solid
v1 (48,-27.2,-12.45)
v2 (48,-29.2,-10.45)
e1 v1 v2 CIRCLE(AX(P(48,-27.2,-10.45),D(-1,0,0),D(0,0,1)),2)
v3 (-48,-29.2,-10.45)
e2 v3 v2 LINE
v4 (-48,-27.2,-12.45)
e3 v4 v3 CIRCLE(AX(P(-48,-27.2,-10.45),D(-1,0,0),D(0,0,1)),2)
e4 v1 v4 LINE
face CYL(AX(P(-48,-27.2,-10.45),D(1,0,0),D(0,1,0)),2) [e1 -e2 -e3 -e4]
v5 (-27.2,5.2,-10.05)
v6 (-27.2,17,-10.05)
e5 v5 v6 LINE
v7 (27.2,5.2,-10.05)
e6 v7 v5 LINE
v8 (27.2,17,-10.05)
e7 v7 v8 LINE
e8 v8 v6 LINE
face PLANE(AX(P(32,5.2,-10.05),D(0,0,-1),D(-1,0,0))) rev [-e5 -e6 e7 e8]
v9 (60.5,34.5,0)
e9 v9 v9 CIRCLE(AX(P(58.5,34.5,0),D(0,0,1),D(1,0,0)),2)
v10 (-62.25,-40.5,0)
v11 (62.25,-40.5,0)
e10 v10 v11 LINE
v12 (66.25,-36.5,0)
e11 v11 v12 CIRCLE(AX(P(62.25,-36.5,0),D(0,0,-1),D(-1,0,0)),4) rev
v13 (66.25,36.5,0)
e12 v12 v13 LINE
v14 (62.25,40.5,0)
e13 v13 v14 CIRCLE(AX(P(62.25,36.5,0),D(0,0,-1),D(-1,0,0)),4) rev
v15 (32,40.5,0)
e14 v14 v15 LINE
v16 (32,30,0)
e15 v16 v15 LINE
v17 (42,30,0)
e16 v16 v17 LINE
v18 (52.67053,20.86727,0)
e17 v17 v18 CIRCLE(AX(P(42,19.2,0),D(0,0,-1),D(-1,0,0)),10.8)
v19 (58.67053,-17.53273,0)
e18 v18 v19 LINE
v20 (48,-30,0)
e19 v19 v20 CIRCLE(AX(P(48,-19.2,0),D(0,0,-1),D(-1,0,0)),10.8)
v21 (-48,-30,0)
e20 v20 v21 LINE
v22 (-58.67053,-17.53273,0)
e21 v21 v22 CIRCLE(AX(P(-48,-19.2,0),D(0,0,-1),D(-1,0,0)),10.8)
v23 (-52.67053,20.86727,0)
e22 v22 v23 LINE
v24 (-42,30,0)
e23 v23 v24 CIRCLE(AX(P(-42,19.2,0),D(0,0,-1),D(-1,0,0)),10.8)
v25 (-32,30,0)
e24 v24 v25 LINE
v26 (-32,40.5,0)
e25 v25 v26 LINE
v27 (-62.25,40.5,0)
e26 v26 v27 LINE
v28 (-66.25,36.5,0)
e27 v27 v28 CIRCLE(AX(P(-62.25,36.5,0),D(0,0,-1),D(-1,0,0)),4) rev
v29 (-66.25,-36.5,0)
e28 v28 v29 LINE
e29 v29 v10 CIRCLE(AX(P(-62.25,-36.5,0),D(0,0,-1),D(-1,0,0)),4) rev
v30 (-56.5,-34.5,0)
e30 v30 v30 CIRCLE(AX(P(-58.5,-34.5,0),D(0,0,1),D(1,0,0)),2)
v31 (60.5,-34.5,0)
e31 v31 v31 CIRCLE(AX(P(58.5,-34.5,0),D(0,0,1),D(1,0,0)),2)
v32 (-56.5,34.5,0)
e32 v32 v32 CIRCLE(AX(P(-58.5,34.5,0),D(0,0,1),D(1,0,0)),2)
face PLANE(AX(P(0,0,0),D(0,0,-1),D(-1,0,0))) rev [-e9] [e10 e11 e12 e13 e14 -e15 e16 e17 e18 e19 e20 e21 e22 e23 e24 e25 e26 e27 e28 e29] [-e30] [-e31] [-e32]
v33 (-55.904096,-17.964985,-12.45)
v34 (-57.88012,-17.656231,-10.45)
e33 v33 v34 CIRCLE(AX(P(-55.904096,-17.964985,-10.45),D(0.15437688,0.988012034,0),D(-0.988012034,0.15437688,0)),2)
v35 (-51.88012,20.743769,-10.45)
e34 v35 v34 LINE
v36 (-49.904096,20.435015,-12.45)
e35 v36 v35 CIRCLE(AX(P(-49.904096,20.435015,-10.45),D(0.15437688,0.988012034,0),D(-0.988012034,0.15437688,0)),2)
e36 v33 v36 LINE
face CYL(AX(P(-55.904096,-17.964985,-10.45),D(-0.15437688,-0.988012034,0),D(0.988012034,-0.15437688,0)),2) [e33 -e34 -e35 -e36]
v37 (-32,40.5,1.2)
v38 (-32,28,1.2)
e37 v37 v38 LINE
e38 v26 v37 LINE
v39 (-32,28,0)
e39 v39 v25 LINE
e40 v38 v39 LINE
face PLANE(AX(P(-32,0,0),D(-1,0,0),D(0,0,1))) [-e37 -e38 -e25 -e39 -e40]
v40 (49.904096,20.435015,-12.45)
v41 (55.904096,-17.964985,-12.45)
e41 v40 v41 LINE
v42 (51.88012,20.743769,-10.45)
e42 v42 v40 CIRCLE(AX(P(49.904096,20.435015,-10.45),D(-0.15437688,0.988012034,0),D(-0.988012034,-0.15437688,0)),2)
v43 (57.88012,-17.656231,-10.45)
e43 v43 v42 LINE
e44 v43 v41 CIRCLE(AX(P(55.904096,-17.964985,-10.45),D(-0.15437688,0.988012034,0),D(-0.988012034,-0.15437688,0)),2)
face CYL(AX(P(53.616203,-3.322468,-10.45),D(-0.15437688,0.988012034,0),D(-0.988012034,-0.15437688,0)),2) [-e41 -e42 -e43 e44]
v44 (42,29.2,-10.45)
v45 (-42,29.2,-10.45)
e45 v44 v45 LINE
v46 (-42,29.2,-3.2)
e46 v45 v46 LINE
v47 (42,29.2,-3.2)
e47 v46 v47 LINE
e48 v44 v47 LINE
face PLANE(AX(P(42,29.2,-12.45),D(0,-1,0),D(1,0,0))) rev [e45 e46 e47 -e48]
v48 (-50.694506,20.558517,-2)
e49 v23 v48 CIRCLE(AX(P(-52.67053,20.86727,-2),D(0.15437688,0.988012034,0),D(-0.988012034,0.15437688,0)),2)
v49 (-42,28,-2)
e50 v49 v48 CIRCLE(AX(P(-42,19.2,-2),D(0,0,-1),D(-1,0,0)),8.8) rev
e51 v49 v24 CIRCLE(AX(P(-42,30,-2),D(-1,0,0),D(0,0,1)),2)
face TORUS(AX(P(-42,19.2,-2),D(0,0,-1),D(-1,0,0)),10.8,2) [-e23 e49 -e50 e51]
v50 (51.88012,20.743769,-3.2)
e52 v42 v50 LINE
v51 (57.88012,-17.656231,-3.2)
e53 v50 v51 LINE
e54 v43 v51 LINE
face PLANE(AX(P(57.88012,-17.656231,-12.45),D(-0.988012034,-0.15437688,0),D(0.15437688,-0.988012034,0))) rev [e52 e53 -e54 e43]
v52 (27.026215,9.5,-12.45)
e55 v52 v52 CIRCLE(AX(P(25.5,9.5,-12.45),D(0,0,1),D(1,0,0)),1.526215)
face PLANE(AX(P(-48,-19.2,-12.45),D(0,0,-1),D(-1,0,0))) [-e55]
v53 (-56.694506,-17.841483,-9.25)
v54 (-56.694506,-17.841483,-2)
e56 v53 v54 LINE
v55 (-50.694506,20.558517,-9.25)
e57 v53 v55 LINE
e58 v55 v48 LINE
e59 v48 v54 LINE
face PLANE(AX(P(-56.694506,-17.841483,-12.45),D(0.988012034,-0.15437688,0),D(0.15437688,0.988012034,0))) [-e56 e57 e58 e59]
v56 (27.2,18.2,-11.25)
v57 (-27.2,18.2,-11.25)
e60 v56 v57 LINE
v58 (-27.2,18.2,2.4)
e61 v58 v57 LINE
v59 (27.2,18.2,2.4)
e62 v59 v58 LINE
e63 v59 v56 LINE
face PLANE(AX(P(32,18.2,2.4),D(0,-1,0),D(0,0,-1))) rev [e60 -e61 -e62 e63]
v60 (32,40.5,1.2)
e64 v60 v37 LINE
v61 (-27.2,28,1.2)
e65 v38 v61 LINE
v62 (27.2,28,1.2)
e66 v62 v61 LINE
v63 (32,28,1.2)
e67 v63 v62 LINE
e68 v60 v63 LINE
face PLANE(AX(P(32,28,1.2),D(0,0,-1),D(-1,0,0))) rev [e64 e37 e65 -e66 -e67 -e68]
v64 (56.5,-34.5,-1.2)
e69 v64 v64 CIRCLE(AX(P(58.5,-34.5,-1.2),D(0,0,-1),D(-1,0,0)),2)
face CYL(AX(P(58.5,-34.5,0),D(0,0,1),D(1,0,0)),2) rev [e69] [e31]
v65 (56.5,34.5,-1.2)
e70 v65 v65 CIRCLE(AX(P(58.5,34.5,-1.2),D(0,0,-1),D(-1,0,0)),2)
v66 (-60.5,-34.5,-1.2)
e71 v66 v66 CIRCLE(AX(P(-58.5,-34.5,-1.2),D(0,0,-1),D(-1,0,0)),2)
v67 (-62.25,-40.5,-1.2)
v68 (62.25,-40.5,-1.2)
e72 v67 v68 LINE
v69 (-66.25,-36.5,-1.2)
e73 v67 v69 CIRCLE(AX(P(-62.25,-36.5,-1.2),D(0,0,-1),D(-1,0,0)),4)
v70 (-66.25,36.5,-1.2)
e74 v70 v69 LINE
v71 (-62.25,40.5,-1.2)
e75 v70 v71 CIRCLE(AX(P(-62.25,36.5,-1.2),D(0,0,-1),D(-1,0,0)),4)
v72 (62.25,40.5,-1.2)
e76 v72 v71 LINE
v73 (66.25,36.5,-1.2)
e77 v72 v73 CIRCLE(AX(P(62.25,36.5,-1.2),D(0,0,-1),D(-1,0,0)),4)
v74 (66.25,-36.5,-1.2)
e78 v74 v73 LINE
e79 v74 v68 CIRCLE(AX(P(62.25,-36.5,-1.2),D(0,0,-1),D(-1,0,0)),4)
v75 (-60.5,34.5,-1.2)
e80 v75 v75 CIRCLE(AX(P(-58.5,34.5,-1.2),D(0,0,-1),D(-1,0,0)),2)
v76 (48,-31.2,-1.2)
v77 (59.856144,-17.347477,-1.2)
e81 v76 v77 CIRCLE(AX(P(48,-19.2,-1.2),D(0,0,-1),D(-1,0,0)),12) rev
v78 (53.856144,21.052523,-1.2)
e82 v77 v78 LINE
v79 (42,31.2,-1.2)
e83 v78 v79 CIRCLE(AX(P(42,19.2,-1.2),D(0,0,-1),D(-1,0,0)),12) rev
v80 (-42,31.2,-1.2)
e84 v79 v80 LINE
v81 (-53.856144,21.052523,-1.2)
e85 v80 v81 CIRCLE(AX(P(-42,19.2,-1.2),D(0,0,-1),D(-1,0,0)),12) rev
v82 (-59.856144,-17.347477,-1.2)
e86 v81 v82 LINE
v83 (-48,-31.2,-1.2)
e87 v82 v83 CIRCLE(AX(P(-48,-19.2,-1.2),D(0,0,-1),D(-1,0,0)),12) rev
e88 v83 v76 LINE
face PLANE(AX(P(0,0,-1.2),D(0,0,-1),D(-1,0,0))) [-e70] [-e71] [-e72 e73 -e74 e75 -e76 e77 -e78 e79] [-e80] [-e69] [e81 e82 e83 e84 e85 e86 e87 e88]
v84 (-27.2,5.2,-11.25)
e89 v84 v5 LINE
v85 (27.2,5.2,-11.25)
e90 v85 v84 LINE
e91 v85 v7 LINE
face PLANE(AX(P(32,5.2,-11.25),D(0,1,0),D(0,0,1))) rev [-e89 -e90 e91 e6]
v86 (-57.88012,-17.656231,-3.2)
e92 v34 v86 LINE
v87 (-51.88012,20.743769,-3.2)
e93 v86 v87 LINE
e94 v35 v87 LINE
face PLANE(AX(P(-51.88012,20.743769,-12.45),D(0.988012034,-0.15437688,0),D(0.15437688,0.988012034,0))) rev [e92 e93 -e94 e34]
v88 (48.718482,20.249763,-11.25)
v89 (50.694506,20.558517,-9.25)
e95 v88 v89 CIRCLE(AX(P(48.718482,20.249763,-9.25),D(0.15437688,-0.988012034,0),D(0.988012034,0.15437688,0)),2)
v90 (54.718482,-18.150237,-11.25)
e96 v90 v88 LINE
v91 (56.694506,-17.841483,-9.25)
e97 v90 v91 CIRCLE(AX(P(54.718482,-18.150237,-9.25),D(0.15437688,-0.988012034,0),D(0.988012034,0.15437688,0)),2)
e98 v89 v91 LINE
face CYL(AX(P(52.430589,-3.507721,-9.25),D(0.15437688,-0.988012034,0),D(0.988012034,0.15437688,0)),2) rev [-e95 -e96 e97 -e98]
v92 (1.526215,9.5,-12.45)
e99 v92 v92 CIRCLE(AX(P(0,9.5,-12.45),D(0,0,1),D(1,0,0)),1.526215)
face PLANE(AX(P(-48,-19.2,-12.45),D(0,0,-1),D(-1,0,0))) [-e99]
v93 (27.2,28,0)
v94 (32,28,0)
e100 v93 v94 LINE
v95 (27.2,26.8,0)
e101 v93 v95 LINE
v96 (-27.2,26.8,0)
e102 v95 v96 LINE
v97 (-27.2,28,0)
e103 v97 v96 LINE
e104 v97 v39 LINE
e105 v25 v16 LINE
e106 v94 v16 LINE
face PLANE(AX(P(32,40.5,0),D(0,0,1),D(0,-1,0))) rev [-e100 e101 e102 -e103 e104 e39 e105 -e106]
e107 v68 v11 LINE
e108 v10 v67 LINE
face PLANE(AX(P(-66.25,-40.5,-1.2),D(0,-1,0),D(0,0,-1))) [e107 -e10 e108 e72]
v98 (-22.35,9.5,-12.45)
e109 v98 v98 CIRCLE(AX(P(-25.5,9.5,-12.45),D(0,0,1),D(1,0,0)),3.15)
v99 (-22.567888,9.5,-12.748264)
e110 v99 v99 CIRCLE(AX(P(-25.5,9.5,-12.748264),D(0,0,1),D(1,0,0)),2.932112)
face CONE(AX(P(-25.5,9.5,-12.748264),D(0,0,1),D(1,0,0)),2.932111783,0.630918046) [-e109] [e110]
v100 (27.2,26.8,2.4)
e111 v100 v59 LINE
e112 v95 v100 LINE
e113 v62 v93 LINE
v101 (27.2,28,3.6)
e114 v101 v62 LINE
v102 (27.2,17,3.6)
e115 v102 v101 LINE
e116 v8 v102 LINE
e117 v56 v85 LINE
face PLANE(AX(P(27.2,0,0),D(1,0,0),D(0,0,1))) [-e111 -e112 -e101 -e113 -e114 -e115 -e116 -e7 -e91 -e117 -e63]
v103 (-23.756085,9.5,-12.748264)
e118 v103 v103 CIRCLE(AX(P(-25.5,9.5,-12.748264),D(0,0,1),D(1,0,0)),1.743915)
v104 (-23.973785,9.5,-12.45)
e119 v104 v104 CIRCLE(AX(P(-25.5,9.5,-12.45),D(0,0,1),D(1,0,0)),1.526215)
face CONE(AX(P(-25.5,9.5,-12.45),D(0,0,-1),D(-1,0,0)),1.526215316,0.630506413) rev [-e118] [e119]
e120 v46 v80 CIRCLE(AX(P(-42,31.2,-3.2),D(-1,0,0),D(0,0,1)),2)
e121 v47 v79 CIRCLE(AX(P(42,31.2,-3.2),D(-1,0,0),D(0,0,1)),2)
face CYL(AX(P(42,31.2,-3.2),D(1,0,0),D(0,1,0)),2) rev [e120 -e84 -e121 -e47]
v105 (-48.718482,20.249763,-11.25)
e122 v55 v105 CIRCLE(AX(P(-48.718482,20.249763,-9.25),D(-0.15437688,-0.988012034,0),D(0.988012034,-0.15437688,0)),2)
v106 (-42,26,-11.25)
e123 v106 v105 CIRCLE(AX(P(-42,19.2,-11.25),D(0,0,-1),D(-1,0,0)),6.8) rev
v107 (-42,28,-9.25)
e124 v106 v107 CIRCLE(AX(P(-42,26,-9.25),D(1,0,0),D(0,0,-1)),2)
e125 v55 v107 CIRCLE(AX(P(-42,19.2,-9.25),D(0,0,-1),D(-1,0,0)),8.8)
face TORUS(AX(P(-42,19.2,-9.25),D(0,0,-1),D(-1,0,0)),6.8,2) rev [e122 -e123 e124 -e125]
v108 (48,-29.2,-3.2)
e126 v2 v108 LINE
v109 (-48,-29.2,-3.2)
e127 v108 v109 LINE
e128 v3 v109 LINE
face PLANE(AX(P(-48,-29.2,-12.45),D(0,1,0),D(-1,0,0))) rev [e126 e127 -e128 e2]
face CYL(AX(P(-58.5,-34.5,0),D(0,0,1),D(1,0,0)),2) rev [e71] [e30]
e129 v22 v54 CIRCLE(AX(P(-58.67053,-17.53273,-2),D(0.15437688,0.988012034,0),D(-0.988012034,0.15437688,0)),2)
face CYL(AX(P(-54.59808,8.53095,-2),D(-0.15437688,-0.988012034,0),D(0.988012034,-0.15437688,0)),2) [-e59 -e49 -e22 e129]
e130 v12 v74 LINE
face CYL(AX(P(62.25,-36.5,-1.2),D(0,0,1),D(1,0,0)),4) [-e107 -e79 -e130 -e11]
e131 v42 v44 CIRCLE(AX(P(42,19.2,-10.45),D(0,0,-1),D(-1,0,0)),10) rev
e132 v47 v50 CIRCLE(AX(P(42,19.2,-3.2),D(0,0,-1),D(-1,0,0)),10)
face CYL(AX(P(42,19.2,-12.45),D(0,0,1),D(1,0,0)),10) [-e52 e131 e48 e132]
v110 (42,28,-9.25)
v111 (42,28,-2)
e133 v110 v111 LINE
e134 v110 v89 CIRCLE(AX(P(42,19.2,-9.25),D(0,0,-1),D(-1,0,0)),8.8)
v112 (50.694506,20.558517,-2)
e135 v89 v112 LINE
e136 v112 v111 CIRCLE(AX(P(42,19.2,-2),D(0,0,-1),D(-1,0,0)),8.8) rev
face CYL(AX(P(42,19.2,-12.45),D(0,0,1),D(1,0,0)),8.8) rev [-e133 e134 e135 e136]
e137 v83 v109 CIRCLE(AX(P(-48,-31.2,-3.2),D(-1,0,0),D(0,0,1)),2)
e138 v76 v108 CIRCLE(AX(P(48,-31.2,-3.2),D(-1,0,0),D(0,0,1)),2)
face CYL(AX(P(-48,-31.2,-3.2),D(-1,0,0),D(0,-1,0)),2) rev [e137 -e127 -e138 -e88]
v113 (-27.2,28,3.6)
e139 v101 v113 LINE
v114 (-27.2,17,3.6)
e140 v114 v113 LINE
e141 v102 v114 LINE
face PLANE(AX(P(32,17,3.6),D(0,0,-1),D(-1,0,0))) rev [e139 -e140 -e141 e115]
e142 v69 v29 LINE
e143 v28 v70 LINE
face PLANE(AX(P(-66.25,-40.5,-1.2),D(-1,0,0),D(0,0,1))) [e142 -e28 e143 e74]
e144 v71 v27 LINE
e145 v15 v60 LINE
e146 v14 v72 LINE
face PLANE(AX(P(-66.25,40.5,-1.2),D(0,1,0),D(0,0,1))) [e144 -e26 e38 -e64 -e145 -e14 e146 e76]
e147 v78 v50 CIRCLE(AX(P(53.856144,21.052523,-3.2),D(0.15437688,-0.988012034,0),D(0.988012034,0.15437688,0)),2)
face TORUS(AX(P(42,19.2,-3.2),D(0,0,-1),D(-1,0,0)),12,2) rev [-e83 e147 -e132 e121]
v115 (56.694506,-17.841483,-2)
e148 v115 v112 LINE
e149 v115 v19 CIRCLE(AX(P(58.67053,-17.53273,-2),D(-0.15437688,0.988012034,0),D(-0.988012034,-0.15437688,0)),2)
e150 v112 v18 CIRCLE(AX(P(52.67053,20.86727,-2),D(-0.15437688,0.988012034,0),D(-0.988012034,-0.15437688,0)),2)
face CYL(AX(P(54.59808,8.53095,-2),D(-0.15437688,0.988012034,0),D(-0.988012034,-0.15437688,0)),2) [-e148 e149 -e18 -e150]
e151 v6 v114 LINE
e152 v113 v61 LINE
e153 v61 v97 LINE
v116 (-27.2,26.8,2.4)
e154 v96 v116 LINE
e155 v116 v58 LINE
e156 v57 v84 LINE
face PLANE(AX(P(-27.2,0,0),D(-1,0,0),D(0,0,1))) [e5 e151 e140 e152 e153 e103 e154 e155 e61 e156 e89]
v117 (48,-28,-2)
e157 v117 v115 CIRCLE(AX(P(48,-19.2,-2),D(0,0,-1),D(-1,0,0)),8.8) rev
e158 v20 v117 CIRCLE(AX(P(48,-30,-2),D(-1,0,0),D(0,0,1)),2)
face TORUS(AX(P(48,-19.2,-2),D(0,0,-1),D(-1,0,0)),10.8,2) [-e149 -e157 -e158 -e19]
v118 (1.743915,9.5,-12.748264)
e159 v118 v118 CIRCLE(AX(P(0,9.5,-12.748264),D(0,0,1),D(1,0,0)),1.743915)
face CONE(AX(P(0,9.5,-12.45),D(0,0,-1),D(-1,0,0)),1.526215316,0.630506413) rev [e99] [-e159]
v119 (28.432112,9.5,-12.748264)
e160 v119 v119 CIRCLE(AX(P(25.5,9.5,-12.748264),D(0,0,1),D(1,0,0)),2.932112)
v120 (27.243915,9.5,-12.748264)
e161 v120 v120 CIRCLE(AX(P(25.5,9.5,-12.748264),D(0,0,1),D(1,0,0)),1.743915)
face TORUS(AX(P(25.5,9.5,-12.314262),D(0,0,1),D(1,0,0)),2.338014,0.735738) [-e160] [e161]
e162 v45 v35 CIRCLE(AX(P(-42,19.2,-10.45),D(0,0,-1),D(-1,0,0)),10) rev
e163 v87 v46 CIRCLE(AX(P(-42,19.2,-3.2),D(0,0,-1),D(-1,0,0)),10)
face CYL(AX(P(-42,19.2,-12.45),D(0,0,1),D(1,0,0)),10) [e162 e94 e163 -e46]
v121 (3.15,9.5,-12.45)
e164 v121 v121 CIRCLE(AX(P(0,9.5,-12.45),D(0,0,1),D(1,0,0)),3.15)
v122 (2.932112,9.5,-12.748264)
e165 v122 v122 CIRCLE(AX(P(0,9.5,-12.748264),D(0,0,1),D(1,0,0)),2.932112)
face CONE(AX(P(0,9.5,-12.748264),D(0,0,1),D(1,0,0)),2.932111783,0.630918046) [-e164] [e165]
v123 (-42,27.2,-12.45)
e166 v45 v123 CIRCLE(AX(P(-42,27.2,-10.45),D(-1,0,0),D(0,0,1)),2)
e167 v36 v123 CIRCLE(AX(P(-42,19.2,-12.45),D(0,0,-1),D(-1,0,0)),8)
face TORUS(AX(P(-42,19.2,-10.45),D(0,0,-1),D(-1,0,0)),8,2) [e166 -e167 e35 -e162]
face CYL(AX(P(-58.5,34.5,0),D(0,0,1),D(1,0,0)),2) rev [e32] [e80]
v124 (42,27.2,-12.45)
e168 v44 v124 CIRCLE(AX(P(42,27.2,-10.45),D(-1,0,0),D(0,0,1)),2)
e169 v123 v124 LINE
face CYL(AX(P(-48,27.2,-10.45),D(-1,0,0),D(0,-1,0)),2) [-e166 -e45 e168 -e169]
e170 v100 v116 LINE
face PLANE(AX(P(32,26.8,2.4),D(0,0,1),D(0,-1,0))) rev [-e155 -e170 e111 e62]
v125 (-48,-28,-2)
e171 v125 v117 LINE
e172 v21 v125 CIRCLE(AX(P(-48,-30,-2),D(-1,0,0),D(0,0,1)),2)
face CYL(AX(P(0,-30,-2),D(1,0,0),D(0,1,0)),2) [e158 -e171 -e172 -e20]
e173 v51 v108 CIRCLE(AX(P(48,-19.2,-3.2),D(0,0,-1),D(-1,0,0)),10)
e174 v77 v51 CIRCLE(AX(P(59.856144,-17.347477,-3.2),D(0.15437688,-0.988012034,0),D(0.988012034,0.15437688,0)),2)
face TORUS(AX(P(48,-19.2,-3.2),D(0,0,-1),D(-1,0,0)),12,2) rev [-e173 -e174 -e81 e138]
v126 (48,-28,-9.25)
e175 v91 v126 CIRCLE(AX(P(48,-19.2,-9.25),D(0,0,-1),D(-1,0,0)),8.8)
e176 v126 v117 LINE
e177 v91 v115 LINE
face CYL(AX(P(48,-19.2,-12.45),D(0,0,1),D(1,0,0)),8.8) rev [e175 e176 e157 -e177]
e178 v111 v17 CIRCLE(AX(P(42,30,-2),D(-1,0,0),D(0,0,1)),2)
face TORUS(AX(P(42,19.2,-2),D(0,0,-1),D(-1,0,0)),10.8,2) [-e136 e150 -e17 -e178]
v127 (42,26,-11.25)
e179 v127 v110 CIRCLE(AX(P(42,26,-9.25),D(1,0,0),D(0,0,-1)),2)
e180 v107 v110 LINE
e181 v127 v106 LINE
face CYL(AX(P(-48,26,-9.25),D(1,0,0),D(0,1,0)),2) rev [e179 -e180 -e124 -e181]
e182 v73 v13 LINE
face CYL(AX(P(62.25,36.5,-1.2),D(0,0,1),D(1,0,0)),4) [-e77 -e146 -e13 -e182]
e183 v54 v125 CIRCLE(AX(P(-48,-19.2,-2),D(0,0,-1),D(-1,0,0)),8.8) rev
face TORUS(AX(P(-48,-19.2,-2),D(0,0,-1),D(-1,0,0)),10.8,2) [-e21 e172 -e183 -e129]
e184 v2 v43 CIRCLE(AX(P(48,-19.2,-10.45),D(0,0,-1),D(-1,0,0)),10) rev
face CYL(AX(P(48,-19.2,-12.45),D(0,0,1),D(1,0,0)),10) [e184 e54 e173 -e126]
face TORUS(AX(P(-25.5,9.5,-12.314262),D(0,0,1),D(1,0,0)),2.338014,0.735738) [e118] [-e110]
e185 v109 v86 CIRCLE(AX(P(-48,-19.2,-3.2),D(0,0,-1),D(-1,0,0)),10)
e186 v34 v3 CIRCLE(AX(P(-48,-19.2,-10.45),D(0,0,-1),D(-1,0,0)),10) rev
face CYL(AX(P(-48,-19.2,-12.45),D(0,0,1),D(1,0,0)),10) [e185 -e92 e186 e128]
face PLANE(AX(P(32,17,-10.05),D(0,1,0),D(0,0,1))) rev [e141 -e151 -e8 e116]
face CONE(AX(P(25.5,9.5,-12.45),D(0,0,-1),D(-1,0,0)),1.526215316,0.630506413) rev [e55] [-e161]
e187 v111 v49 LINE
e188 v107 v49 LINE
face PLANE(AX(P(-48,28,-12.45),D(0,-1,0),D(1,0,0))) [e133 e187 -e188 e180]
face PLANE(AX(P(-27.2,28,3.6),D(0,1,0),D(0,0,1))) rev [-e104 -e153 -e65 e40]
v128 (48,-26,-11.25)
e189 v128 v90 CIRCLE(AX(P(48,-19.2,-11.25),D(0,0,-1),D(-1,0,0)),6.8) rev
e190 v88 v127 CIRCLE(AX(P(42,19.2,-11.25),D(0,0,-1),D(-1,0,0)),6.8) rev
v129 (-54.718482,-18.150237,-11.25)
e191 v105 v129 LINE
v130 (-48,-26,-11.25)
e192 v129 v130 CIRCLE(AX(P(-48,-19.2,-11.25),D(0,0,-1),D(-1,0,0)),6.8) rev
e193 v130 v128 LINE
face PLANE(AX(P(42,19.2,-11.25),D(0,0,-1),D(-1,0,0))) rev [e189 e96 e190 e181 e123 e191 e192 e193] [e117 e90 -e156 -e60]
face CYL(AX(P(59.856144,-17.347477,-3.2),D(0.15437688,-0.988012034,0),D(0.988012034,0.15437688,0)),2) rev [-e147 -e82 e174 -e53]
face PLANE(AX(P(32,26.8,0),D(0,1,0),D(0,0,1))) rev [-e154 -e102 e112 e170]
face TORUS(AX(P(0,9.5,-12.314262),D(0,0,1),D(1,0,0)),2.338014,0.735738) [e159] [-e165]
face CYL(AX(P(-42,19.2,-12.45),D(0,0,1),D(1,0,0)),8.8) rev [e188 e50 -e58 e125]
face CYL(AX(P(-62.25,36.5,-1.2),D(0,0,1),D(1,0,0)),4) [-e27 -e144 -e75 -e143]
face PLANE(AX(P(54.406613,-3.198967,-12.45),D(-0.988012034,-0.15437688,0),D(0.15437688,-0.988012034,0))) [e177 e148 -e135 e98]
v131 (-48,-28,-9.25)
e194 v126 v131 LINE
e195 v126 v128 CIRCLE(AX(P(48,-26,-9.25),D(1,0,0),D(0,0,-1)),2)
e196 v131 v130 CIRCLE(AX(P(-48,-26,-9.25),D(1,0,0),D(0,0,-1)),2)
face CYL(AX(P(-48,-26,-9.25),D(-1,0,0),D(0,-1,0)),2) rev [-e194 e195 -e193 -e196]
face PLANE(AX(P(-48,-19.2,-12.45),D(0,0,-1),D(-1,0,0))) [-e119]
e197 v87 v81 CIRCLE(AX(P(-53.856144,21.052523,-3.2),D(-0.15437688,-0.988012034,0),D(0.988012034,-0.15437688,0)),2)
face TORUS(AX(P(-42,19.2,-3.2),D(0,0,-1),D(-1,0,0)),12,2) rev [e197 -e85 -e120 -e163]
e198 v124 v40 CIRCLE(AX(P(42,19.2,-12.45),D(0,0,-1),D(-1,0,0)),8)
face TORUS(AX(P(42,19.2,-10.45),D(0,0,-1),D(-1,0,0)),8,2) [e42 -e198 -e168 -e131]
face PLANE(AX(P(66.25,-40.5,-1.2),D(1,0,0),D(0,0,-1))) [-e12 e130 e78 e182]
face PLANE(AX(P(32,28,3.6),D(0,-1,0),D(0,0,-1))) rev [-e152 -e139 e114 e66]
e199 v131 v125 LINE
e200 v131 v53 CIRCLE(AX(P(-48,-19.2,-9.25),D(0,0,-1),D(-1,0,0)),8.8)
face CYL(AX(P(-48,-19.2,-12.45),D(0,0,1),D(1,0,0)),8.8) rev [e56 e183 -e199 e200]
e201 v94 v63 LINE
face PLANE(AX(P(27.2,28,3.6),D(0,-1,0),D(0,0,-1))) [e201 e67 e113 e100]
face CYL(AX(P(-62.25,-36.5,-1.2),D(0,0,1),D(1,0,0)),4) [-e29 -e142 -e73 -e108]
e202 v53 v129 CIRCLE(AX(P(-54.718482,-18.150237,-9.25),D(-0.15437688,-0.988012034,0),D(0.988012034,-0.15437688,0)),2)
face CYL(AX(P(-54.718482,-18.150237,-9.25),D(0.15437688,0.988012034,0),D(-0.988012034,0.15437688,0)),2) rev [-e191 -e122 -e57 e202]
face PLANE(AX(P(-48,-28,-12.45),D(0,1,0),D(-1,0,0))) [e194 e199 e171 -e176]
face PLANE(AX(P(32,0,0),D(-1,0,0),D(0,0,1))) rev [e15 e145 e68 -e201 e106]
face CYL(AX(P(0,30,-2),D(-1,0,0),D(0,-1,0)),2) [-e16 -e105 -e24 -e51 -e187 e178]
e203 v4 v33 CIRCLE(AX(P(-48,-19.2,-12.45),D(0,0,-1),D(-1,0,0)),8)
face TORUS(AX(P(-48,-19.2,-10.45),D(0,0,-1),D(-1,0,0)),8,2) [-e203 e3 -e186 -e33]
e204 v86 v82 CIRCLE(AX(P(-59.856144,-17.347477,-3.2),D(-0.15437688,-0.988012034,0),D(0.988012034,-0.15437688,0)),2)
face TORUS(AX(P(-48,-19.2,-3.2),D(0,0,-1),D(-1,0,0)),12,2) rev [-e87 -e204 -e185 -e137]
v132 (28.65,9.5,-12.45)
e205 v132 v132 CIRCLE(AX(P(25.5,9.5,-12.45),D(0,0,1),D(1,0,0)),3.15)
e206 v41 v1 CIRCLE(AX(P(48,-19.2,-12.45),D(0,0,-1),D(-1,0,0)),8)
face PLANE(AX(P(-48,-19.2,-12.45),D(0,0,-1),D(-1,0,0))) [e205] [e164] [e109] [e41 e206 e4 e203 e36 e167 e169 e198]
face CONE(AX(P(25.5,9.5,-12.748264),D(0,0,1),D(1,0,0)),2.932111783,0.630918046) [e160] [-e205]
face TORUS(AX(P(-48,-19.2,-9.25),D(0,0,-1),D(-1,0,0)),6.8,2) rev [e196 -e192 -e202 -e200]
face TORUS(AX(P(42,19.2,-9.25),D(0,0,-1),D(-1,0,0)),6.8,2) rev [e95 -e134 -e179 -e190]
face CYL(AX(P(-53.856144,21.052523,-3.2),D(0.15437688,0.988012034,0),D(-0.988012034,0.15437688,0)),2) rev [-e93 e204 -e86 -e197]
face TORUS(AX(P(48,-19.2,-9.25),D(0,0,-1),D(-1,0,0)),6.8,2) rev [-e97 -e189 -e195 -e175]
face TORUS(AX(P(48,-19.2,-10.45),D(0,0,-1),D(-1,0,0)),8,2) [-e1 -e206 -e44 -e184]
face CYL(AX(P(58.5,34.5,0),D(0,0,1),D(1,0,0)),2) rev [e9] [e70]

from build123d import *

# Parameters (mm, degrees)
SKETCH1_W                = 132.5
SKETCH1_H                = 81
BOSS_EXTRUDE1_DEPTH      = 1.2
EXTRUDE_THIN1_DEPTH      = 11.25
CUT_EXTRUDE1_DEPTH       = 79.459384397
BOSS_EXTRUDE2_START      = -1.2
BOSS_EXTRUDE2_DEPTH      = 1.2
FILLET1_R                = 2
FILLET2_R                = 4
F_4_0_4_DIAMETER_HOLE1_D = 4
BOSS_EXTRUDE3_DEPTH      = 32
CUT_EXTRUDE3_DEPTH       = 4.8
LPATTERN1_COUNT          = 2
LPATTERN1_PITCH          = 25.5
LPATTERN1_COUNT_DIR2     = 2
LPATTERN1_PITCH_DIR2     = 25.5


with BuildPart() as part:
    # Sketch1 → Boss-Extrude1 (new body)
    with BuildSketch(Plane.XY):
        Rectangle(SKETCH1_W, SKETCH1_H)
    extrude(amount=-BOSS_EXTRUDE1_DEPTH)

    # Sketch2 → Extrude-Thin1 (add)
    with BuildSketch(Plane(origin=(0, 0, -1.2), x_dir=(-1, 0, 0), z_dir=(0, 0, -1))):
        with BuildLine():
            Line((-42, 29.2), (42, 29.2))
            ThreePointArc((42, 29.2), (48.502396173, 26.797291887), (51.880120338, 20.743768803))
            Line((51.880120338, 20.743768803), (57.880120338, -17.656231197))
            ThreePointArc((57.880120338, -17.656231197), (55.597291887, -25.702396173), (48, -29.2))
            Line((48, -29.2), (-48, -29.2))
            ThreePointArc((-48, -29.2), (-55.597291887, -25.702396173), (-57.880120338, -17.656231197))
            Line((-57.880120338, -17.656231197), (-51.880120338, 20.743768803))
            ThreePointArc((-51.880120338, 20.743768803), (-48.502396173, 26.797291887), (-42, 29.2))
        make_face()
        with BuildLine():
            Line((-42, 28), (42, 28))
            ThreePointArc((42, 28), (47.722108632, 25.88561686), (50.694505897, 20.558516546))
            Line((50.694505897, 20.558516546), (56.694505897, -17.841483454))
            ThreePointArc((56.694505897, -17.841483454), (54.68561686, -24.922108632), (48, -28))
            Line((48, -28), (-48, -28))
            ThreePointArc((-48, -28), (-54.68561686, -24.922108632), (-56.694505897, -17.841483454))
            Line((-56.694505897, -17.841483454), (-50.694505897, 20.558516546))
            ThreePointArc((-50.694505897, 20.558516546), (-47.722108632, 25.88561686), (-42, 28))
        make_face(mode=Mode.SUBTRACT)
    extrude(amount=EXTRUDE_THIN1_DEPTH)

    # Sketch3 → Cut-Extrude1 (cut, through all)
    with BuildSketch(Plane(origin=(0, 0, -1.2), x_dir=(-1, 0, 0), z_dir=(0, 0, -1))):
        with BuildLine():
            Line((56.694505897, -17.841483454), (50.694505897, 20.558516546))
            ThreePointArc((50.694505897, 20.558516546), (47.722108632, 25.88561686), (42, 28))
            Line((42, 28), (-42, 28))
            ThreePointArc((-42, 28), (-47.722108632, 25.88561686), (-50.694505897, 20.558516546))
            Line((-50.694505897, 20.558516546), (-56.694505897, -17.841483454))
            ThreePointArc((-56.694505897, -17.841483454), (-54.68561686, -24.922108632), (-48, -28))
            Line((-48, -28), (48, -28))
            ThreePointArc((48, -28), (54.68561686, -24.922108632), (56.694505897, -17.841483454))
        make_face()
    extrude(amount=-CUT_EXTRUDE1_DEPTH, mode=Mode.SUBTRACT)

    # Sketch4 → Boss-Extrude2 (add)
    with BuildSketch(Plane(origin=(0, 0, -12.45), x_dir=(-1, 0, 0), z_dir=(0, 0, -1)).offset(BOSS_EXTRUDE2_START)):
        with BuildLine():
            Line((-51.880120338, 20.743768803), (-57.880120338, -17.656231197))
            ThreePointArc((-57.880120338, -17.656231197), (-55.597291887, -25.702396173), (-48, -29.2))
            Line((-48, -29.2), (48, -29.2))
            ThreePointArc((48, -29.2), (55.597291887, -25.702396173), (57.880120338, -17.656231197))
            Line((57.880120338, -17.656231197), (51.880120338, 20.743768803))
            ThreePointArc((51.880120338, 20.743768803), (48.502396173, 26.797291887), (42, 29.2))
            Line((42, 29.2), (-42, 29.2))
            ThreePointArc((-42, 29.2), (-48.502396173, 26.797291887), (-51.880120338, 20.743768803))
        make_face()
    extrude(amount=BOSS_EXTRUDE2_DEPTH)

    # Fillet1
    fillet1_edges = [part.edges().sort_by_distance(p)[0] for p in [
        (-48.502396173, 26.797291887, -12.45),
        (-54.880120338, 1.543768803, -12.45),
        (-55.597291887, -25.702396173, -12.45),
        (0, -29.2, -12.45),
        (55.597291887, -25.702396173, -12.45),
        (54.880120338, 1.543768803, -12.45),
        (48.502396173, 26.797291887, -12.45),
        (-47.722108632, 25.88561686, 0),
        (-53.694505897, 1.358516546, 0),
        (-54.68561686, -24.922108632, 0),
        (0, -28, 0),
        (54.68561686, -24.922108632, 0),
        (53.694505897, 1.358516546, 0),
        (47.722108632, 25.88561686, 0),
        (0, 29.2, -12.45),
        (0, 28, 0),
        (-47.722108632, 25.88561686, -11.25),
        (-53.694505897, 1.358516546, -11.25),
        (-54.68561686, -24.922108632, -11.25),
        (0, -28, -11.25),
        (54.68561686, -24.922108632, -11.25),
        (53.694505897, 1.358516546, -11.25),
        (47.722108632, 25.88561686, -11.25),
        (48.502396173, 26.797291887, -1.2),
        (0, 29.2, -1.2),
        (-48.502396173, 26.797291887, -1.2),
        (-54.880120338, 1.543768803, -1.2),
        (-55.597291887, -25.702396173, -1.2),
        (0, -29.2, -1.2),
        (55.597291887, -25.702396173, -1.2),
        (0, 28, -11.25),
        (54.880120338, 1.543768803, -1.2),
    ]]
    fillet(fillet1_edges, radius=FILLET1_R)

    # Fillet2
    fillet2_edges = [part.edges().sort_by_distance(p)[0] for p in [
        (-66.25, -40.5, -0.6),
        (-66.25, 40.5, -0.6),
        (66.25, 40.5, -0.6),
        (66.25, -40.5, -0.6),
    ]]
    fillet(fillet2_edges, radius=FILLET2_R)

    # Ø4.0 (4) Diameter Hole1 (through all)
    with Locations(Plane.XY):
        with Locations((-58.5, 34.5), (58.5, 34.5), (58.5, -34.5), (-58.5, -34.5)):
            Hole(F_4_0_4_DIAMETER_HOLE1_D / 2)

    # Sketch7 → Boss-Extrude3 (add, symmetric)
    with BuildSketch(Plane(origin=(0, 0, 0), x_dir=(0, 0, -1), z_dir=(1, 0, 0))):
        Polygon((0, 40.5), (0, 26.8), (-2.4, 26.8), (-2.4, 18.2), (11.25, 18.2), (11.25, 5.2), (10.05, 5.2), (10.05, 17), (-3.6, 17), (-3.6, 28), (-1.2, 28), (-1.2, 40.5), align=None)
    extrude(amount=BOSS_EXTRUDE3_DEPTH, both=True)

    # Sketch9 → Cut-Extrude3 (cut)
    with BuildSketch(Plane.ZY.offset(32)):
        Polygon((2.4, 18.2), (2.4, 26.8), (0, 26.8), (0, 28), (3.6, 28), (3.6, 17), (-10.05, 17), (-10.05, 5.2), (-11.25, 5.2), (-11.25, 18.2), align=None)
    cut_extrude3 = extrude(amount=-CUT_EXTRUDE3_DEPTH, mode=Mode.SUBTRACT)

    # Mirror1: Cut-Extrude3 across plane
    add(cut_extrude3.mirror(Plane(origin=(0, 0, 0), x_dir=(0, 0, 1), z_dir=(1, 0, 0))), mode=Mode.SUBTRACT)

    # Sketch12 → Revolve1 (revolve)
    with BuildSketch(Plane(origin=(0, 0, 0), x_dir=(0, 0, -1), z_dir=(1, 0, 0))):
        with BuildLine():
            Line((12.45, 12.65), (12.748263829, 12.432111783))
            ThreePointArc((12.748263829, 12.432111783), (13.049999993, 11.838013538), (12.748263829, 11.243915294))
            Line((12.748263829, 11.243915294), (12.45, 11.026215316))
            Line((12.45, 11.026215316), (12.45, 12.65))
        make_face()
    revolve1 = revolve(axis=Axis((0, 9.5, -12.45), (0, 0, -1)))

    # LPattern1: Revolve1 2 × 2, 1 skipped
    with Locations(*[Vector(-1, 0, 0) * (i * LPATTERN1_PITCH) + Vector(1, 0, 0) * (j * LPATTERN1_PITCH_DIR2) for i in range(LPATTERN1_COUNT) for j in range(LPATTERN1_COUNT_DIR2) if (i, j) not in ((0, 0), (1, 1))]):
        add(revolve1)


solid = part.part
